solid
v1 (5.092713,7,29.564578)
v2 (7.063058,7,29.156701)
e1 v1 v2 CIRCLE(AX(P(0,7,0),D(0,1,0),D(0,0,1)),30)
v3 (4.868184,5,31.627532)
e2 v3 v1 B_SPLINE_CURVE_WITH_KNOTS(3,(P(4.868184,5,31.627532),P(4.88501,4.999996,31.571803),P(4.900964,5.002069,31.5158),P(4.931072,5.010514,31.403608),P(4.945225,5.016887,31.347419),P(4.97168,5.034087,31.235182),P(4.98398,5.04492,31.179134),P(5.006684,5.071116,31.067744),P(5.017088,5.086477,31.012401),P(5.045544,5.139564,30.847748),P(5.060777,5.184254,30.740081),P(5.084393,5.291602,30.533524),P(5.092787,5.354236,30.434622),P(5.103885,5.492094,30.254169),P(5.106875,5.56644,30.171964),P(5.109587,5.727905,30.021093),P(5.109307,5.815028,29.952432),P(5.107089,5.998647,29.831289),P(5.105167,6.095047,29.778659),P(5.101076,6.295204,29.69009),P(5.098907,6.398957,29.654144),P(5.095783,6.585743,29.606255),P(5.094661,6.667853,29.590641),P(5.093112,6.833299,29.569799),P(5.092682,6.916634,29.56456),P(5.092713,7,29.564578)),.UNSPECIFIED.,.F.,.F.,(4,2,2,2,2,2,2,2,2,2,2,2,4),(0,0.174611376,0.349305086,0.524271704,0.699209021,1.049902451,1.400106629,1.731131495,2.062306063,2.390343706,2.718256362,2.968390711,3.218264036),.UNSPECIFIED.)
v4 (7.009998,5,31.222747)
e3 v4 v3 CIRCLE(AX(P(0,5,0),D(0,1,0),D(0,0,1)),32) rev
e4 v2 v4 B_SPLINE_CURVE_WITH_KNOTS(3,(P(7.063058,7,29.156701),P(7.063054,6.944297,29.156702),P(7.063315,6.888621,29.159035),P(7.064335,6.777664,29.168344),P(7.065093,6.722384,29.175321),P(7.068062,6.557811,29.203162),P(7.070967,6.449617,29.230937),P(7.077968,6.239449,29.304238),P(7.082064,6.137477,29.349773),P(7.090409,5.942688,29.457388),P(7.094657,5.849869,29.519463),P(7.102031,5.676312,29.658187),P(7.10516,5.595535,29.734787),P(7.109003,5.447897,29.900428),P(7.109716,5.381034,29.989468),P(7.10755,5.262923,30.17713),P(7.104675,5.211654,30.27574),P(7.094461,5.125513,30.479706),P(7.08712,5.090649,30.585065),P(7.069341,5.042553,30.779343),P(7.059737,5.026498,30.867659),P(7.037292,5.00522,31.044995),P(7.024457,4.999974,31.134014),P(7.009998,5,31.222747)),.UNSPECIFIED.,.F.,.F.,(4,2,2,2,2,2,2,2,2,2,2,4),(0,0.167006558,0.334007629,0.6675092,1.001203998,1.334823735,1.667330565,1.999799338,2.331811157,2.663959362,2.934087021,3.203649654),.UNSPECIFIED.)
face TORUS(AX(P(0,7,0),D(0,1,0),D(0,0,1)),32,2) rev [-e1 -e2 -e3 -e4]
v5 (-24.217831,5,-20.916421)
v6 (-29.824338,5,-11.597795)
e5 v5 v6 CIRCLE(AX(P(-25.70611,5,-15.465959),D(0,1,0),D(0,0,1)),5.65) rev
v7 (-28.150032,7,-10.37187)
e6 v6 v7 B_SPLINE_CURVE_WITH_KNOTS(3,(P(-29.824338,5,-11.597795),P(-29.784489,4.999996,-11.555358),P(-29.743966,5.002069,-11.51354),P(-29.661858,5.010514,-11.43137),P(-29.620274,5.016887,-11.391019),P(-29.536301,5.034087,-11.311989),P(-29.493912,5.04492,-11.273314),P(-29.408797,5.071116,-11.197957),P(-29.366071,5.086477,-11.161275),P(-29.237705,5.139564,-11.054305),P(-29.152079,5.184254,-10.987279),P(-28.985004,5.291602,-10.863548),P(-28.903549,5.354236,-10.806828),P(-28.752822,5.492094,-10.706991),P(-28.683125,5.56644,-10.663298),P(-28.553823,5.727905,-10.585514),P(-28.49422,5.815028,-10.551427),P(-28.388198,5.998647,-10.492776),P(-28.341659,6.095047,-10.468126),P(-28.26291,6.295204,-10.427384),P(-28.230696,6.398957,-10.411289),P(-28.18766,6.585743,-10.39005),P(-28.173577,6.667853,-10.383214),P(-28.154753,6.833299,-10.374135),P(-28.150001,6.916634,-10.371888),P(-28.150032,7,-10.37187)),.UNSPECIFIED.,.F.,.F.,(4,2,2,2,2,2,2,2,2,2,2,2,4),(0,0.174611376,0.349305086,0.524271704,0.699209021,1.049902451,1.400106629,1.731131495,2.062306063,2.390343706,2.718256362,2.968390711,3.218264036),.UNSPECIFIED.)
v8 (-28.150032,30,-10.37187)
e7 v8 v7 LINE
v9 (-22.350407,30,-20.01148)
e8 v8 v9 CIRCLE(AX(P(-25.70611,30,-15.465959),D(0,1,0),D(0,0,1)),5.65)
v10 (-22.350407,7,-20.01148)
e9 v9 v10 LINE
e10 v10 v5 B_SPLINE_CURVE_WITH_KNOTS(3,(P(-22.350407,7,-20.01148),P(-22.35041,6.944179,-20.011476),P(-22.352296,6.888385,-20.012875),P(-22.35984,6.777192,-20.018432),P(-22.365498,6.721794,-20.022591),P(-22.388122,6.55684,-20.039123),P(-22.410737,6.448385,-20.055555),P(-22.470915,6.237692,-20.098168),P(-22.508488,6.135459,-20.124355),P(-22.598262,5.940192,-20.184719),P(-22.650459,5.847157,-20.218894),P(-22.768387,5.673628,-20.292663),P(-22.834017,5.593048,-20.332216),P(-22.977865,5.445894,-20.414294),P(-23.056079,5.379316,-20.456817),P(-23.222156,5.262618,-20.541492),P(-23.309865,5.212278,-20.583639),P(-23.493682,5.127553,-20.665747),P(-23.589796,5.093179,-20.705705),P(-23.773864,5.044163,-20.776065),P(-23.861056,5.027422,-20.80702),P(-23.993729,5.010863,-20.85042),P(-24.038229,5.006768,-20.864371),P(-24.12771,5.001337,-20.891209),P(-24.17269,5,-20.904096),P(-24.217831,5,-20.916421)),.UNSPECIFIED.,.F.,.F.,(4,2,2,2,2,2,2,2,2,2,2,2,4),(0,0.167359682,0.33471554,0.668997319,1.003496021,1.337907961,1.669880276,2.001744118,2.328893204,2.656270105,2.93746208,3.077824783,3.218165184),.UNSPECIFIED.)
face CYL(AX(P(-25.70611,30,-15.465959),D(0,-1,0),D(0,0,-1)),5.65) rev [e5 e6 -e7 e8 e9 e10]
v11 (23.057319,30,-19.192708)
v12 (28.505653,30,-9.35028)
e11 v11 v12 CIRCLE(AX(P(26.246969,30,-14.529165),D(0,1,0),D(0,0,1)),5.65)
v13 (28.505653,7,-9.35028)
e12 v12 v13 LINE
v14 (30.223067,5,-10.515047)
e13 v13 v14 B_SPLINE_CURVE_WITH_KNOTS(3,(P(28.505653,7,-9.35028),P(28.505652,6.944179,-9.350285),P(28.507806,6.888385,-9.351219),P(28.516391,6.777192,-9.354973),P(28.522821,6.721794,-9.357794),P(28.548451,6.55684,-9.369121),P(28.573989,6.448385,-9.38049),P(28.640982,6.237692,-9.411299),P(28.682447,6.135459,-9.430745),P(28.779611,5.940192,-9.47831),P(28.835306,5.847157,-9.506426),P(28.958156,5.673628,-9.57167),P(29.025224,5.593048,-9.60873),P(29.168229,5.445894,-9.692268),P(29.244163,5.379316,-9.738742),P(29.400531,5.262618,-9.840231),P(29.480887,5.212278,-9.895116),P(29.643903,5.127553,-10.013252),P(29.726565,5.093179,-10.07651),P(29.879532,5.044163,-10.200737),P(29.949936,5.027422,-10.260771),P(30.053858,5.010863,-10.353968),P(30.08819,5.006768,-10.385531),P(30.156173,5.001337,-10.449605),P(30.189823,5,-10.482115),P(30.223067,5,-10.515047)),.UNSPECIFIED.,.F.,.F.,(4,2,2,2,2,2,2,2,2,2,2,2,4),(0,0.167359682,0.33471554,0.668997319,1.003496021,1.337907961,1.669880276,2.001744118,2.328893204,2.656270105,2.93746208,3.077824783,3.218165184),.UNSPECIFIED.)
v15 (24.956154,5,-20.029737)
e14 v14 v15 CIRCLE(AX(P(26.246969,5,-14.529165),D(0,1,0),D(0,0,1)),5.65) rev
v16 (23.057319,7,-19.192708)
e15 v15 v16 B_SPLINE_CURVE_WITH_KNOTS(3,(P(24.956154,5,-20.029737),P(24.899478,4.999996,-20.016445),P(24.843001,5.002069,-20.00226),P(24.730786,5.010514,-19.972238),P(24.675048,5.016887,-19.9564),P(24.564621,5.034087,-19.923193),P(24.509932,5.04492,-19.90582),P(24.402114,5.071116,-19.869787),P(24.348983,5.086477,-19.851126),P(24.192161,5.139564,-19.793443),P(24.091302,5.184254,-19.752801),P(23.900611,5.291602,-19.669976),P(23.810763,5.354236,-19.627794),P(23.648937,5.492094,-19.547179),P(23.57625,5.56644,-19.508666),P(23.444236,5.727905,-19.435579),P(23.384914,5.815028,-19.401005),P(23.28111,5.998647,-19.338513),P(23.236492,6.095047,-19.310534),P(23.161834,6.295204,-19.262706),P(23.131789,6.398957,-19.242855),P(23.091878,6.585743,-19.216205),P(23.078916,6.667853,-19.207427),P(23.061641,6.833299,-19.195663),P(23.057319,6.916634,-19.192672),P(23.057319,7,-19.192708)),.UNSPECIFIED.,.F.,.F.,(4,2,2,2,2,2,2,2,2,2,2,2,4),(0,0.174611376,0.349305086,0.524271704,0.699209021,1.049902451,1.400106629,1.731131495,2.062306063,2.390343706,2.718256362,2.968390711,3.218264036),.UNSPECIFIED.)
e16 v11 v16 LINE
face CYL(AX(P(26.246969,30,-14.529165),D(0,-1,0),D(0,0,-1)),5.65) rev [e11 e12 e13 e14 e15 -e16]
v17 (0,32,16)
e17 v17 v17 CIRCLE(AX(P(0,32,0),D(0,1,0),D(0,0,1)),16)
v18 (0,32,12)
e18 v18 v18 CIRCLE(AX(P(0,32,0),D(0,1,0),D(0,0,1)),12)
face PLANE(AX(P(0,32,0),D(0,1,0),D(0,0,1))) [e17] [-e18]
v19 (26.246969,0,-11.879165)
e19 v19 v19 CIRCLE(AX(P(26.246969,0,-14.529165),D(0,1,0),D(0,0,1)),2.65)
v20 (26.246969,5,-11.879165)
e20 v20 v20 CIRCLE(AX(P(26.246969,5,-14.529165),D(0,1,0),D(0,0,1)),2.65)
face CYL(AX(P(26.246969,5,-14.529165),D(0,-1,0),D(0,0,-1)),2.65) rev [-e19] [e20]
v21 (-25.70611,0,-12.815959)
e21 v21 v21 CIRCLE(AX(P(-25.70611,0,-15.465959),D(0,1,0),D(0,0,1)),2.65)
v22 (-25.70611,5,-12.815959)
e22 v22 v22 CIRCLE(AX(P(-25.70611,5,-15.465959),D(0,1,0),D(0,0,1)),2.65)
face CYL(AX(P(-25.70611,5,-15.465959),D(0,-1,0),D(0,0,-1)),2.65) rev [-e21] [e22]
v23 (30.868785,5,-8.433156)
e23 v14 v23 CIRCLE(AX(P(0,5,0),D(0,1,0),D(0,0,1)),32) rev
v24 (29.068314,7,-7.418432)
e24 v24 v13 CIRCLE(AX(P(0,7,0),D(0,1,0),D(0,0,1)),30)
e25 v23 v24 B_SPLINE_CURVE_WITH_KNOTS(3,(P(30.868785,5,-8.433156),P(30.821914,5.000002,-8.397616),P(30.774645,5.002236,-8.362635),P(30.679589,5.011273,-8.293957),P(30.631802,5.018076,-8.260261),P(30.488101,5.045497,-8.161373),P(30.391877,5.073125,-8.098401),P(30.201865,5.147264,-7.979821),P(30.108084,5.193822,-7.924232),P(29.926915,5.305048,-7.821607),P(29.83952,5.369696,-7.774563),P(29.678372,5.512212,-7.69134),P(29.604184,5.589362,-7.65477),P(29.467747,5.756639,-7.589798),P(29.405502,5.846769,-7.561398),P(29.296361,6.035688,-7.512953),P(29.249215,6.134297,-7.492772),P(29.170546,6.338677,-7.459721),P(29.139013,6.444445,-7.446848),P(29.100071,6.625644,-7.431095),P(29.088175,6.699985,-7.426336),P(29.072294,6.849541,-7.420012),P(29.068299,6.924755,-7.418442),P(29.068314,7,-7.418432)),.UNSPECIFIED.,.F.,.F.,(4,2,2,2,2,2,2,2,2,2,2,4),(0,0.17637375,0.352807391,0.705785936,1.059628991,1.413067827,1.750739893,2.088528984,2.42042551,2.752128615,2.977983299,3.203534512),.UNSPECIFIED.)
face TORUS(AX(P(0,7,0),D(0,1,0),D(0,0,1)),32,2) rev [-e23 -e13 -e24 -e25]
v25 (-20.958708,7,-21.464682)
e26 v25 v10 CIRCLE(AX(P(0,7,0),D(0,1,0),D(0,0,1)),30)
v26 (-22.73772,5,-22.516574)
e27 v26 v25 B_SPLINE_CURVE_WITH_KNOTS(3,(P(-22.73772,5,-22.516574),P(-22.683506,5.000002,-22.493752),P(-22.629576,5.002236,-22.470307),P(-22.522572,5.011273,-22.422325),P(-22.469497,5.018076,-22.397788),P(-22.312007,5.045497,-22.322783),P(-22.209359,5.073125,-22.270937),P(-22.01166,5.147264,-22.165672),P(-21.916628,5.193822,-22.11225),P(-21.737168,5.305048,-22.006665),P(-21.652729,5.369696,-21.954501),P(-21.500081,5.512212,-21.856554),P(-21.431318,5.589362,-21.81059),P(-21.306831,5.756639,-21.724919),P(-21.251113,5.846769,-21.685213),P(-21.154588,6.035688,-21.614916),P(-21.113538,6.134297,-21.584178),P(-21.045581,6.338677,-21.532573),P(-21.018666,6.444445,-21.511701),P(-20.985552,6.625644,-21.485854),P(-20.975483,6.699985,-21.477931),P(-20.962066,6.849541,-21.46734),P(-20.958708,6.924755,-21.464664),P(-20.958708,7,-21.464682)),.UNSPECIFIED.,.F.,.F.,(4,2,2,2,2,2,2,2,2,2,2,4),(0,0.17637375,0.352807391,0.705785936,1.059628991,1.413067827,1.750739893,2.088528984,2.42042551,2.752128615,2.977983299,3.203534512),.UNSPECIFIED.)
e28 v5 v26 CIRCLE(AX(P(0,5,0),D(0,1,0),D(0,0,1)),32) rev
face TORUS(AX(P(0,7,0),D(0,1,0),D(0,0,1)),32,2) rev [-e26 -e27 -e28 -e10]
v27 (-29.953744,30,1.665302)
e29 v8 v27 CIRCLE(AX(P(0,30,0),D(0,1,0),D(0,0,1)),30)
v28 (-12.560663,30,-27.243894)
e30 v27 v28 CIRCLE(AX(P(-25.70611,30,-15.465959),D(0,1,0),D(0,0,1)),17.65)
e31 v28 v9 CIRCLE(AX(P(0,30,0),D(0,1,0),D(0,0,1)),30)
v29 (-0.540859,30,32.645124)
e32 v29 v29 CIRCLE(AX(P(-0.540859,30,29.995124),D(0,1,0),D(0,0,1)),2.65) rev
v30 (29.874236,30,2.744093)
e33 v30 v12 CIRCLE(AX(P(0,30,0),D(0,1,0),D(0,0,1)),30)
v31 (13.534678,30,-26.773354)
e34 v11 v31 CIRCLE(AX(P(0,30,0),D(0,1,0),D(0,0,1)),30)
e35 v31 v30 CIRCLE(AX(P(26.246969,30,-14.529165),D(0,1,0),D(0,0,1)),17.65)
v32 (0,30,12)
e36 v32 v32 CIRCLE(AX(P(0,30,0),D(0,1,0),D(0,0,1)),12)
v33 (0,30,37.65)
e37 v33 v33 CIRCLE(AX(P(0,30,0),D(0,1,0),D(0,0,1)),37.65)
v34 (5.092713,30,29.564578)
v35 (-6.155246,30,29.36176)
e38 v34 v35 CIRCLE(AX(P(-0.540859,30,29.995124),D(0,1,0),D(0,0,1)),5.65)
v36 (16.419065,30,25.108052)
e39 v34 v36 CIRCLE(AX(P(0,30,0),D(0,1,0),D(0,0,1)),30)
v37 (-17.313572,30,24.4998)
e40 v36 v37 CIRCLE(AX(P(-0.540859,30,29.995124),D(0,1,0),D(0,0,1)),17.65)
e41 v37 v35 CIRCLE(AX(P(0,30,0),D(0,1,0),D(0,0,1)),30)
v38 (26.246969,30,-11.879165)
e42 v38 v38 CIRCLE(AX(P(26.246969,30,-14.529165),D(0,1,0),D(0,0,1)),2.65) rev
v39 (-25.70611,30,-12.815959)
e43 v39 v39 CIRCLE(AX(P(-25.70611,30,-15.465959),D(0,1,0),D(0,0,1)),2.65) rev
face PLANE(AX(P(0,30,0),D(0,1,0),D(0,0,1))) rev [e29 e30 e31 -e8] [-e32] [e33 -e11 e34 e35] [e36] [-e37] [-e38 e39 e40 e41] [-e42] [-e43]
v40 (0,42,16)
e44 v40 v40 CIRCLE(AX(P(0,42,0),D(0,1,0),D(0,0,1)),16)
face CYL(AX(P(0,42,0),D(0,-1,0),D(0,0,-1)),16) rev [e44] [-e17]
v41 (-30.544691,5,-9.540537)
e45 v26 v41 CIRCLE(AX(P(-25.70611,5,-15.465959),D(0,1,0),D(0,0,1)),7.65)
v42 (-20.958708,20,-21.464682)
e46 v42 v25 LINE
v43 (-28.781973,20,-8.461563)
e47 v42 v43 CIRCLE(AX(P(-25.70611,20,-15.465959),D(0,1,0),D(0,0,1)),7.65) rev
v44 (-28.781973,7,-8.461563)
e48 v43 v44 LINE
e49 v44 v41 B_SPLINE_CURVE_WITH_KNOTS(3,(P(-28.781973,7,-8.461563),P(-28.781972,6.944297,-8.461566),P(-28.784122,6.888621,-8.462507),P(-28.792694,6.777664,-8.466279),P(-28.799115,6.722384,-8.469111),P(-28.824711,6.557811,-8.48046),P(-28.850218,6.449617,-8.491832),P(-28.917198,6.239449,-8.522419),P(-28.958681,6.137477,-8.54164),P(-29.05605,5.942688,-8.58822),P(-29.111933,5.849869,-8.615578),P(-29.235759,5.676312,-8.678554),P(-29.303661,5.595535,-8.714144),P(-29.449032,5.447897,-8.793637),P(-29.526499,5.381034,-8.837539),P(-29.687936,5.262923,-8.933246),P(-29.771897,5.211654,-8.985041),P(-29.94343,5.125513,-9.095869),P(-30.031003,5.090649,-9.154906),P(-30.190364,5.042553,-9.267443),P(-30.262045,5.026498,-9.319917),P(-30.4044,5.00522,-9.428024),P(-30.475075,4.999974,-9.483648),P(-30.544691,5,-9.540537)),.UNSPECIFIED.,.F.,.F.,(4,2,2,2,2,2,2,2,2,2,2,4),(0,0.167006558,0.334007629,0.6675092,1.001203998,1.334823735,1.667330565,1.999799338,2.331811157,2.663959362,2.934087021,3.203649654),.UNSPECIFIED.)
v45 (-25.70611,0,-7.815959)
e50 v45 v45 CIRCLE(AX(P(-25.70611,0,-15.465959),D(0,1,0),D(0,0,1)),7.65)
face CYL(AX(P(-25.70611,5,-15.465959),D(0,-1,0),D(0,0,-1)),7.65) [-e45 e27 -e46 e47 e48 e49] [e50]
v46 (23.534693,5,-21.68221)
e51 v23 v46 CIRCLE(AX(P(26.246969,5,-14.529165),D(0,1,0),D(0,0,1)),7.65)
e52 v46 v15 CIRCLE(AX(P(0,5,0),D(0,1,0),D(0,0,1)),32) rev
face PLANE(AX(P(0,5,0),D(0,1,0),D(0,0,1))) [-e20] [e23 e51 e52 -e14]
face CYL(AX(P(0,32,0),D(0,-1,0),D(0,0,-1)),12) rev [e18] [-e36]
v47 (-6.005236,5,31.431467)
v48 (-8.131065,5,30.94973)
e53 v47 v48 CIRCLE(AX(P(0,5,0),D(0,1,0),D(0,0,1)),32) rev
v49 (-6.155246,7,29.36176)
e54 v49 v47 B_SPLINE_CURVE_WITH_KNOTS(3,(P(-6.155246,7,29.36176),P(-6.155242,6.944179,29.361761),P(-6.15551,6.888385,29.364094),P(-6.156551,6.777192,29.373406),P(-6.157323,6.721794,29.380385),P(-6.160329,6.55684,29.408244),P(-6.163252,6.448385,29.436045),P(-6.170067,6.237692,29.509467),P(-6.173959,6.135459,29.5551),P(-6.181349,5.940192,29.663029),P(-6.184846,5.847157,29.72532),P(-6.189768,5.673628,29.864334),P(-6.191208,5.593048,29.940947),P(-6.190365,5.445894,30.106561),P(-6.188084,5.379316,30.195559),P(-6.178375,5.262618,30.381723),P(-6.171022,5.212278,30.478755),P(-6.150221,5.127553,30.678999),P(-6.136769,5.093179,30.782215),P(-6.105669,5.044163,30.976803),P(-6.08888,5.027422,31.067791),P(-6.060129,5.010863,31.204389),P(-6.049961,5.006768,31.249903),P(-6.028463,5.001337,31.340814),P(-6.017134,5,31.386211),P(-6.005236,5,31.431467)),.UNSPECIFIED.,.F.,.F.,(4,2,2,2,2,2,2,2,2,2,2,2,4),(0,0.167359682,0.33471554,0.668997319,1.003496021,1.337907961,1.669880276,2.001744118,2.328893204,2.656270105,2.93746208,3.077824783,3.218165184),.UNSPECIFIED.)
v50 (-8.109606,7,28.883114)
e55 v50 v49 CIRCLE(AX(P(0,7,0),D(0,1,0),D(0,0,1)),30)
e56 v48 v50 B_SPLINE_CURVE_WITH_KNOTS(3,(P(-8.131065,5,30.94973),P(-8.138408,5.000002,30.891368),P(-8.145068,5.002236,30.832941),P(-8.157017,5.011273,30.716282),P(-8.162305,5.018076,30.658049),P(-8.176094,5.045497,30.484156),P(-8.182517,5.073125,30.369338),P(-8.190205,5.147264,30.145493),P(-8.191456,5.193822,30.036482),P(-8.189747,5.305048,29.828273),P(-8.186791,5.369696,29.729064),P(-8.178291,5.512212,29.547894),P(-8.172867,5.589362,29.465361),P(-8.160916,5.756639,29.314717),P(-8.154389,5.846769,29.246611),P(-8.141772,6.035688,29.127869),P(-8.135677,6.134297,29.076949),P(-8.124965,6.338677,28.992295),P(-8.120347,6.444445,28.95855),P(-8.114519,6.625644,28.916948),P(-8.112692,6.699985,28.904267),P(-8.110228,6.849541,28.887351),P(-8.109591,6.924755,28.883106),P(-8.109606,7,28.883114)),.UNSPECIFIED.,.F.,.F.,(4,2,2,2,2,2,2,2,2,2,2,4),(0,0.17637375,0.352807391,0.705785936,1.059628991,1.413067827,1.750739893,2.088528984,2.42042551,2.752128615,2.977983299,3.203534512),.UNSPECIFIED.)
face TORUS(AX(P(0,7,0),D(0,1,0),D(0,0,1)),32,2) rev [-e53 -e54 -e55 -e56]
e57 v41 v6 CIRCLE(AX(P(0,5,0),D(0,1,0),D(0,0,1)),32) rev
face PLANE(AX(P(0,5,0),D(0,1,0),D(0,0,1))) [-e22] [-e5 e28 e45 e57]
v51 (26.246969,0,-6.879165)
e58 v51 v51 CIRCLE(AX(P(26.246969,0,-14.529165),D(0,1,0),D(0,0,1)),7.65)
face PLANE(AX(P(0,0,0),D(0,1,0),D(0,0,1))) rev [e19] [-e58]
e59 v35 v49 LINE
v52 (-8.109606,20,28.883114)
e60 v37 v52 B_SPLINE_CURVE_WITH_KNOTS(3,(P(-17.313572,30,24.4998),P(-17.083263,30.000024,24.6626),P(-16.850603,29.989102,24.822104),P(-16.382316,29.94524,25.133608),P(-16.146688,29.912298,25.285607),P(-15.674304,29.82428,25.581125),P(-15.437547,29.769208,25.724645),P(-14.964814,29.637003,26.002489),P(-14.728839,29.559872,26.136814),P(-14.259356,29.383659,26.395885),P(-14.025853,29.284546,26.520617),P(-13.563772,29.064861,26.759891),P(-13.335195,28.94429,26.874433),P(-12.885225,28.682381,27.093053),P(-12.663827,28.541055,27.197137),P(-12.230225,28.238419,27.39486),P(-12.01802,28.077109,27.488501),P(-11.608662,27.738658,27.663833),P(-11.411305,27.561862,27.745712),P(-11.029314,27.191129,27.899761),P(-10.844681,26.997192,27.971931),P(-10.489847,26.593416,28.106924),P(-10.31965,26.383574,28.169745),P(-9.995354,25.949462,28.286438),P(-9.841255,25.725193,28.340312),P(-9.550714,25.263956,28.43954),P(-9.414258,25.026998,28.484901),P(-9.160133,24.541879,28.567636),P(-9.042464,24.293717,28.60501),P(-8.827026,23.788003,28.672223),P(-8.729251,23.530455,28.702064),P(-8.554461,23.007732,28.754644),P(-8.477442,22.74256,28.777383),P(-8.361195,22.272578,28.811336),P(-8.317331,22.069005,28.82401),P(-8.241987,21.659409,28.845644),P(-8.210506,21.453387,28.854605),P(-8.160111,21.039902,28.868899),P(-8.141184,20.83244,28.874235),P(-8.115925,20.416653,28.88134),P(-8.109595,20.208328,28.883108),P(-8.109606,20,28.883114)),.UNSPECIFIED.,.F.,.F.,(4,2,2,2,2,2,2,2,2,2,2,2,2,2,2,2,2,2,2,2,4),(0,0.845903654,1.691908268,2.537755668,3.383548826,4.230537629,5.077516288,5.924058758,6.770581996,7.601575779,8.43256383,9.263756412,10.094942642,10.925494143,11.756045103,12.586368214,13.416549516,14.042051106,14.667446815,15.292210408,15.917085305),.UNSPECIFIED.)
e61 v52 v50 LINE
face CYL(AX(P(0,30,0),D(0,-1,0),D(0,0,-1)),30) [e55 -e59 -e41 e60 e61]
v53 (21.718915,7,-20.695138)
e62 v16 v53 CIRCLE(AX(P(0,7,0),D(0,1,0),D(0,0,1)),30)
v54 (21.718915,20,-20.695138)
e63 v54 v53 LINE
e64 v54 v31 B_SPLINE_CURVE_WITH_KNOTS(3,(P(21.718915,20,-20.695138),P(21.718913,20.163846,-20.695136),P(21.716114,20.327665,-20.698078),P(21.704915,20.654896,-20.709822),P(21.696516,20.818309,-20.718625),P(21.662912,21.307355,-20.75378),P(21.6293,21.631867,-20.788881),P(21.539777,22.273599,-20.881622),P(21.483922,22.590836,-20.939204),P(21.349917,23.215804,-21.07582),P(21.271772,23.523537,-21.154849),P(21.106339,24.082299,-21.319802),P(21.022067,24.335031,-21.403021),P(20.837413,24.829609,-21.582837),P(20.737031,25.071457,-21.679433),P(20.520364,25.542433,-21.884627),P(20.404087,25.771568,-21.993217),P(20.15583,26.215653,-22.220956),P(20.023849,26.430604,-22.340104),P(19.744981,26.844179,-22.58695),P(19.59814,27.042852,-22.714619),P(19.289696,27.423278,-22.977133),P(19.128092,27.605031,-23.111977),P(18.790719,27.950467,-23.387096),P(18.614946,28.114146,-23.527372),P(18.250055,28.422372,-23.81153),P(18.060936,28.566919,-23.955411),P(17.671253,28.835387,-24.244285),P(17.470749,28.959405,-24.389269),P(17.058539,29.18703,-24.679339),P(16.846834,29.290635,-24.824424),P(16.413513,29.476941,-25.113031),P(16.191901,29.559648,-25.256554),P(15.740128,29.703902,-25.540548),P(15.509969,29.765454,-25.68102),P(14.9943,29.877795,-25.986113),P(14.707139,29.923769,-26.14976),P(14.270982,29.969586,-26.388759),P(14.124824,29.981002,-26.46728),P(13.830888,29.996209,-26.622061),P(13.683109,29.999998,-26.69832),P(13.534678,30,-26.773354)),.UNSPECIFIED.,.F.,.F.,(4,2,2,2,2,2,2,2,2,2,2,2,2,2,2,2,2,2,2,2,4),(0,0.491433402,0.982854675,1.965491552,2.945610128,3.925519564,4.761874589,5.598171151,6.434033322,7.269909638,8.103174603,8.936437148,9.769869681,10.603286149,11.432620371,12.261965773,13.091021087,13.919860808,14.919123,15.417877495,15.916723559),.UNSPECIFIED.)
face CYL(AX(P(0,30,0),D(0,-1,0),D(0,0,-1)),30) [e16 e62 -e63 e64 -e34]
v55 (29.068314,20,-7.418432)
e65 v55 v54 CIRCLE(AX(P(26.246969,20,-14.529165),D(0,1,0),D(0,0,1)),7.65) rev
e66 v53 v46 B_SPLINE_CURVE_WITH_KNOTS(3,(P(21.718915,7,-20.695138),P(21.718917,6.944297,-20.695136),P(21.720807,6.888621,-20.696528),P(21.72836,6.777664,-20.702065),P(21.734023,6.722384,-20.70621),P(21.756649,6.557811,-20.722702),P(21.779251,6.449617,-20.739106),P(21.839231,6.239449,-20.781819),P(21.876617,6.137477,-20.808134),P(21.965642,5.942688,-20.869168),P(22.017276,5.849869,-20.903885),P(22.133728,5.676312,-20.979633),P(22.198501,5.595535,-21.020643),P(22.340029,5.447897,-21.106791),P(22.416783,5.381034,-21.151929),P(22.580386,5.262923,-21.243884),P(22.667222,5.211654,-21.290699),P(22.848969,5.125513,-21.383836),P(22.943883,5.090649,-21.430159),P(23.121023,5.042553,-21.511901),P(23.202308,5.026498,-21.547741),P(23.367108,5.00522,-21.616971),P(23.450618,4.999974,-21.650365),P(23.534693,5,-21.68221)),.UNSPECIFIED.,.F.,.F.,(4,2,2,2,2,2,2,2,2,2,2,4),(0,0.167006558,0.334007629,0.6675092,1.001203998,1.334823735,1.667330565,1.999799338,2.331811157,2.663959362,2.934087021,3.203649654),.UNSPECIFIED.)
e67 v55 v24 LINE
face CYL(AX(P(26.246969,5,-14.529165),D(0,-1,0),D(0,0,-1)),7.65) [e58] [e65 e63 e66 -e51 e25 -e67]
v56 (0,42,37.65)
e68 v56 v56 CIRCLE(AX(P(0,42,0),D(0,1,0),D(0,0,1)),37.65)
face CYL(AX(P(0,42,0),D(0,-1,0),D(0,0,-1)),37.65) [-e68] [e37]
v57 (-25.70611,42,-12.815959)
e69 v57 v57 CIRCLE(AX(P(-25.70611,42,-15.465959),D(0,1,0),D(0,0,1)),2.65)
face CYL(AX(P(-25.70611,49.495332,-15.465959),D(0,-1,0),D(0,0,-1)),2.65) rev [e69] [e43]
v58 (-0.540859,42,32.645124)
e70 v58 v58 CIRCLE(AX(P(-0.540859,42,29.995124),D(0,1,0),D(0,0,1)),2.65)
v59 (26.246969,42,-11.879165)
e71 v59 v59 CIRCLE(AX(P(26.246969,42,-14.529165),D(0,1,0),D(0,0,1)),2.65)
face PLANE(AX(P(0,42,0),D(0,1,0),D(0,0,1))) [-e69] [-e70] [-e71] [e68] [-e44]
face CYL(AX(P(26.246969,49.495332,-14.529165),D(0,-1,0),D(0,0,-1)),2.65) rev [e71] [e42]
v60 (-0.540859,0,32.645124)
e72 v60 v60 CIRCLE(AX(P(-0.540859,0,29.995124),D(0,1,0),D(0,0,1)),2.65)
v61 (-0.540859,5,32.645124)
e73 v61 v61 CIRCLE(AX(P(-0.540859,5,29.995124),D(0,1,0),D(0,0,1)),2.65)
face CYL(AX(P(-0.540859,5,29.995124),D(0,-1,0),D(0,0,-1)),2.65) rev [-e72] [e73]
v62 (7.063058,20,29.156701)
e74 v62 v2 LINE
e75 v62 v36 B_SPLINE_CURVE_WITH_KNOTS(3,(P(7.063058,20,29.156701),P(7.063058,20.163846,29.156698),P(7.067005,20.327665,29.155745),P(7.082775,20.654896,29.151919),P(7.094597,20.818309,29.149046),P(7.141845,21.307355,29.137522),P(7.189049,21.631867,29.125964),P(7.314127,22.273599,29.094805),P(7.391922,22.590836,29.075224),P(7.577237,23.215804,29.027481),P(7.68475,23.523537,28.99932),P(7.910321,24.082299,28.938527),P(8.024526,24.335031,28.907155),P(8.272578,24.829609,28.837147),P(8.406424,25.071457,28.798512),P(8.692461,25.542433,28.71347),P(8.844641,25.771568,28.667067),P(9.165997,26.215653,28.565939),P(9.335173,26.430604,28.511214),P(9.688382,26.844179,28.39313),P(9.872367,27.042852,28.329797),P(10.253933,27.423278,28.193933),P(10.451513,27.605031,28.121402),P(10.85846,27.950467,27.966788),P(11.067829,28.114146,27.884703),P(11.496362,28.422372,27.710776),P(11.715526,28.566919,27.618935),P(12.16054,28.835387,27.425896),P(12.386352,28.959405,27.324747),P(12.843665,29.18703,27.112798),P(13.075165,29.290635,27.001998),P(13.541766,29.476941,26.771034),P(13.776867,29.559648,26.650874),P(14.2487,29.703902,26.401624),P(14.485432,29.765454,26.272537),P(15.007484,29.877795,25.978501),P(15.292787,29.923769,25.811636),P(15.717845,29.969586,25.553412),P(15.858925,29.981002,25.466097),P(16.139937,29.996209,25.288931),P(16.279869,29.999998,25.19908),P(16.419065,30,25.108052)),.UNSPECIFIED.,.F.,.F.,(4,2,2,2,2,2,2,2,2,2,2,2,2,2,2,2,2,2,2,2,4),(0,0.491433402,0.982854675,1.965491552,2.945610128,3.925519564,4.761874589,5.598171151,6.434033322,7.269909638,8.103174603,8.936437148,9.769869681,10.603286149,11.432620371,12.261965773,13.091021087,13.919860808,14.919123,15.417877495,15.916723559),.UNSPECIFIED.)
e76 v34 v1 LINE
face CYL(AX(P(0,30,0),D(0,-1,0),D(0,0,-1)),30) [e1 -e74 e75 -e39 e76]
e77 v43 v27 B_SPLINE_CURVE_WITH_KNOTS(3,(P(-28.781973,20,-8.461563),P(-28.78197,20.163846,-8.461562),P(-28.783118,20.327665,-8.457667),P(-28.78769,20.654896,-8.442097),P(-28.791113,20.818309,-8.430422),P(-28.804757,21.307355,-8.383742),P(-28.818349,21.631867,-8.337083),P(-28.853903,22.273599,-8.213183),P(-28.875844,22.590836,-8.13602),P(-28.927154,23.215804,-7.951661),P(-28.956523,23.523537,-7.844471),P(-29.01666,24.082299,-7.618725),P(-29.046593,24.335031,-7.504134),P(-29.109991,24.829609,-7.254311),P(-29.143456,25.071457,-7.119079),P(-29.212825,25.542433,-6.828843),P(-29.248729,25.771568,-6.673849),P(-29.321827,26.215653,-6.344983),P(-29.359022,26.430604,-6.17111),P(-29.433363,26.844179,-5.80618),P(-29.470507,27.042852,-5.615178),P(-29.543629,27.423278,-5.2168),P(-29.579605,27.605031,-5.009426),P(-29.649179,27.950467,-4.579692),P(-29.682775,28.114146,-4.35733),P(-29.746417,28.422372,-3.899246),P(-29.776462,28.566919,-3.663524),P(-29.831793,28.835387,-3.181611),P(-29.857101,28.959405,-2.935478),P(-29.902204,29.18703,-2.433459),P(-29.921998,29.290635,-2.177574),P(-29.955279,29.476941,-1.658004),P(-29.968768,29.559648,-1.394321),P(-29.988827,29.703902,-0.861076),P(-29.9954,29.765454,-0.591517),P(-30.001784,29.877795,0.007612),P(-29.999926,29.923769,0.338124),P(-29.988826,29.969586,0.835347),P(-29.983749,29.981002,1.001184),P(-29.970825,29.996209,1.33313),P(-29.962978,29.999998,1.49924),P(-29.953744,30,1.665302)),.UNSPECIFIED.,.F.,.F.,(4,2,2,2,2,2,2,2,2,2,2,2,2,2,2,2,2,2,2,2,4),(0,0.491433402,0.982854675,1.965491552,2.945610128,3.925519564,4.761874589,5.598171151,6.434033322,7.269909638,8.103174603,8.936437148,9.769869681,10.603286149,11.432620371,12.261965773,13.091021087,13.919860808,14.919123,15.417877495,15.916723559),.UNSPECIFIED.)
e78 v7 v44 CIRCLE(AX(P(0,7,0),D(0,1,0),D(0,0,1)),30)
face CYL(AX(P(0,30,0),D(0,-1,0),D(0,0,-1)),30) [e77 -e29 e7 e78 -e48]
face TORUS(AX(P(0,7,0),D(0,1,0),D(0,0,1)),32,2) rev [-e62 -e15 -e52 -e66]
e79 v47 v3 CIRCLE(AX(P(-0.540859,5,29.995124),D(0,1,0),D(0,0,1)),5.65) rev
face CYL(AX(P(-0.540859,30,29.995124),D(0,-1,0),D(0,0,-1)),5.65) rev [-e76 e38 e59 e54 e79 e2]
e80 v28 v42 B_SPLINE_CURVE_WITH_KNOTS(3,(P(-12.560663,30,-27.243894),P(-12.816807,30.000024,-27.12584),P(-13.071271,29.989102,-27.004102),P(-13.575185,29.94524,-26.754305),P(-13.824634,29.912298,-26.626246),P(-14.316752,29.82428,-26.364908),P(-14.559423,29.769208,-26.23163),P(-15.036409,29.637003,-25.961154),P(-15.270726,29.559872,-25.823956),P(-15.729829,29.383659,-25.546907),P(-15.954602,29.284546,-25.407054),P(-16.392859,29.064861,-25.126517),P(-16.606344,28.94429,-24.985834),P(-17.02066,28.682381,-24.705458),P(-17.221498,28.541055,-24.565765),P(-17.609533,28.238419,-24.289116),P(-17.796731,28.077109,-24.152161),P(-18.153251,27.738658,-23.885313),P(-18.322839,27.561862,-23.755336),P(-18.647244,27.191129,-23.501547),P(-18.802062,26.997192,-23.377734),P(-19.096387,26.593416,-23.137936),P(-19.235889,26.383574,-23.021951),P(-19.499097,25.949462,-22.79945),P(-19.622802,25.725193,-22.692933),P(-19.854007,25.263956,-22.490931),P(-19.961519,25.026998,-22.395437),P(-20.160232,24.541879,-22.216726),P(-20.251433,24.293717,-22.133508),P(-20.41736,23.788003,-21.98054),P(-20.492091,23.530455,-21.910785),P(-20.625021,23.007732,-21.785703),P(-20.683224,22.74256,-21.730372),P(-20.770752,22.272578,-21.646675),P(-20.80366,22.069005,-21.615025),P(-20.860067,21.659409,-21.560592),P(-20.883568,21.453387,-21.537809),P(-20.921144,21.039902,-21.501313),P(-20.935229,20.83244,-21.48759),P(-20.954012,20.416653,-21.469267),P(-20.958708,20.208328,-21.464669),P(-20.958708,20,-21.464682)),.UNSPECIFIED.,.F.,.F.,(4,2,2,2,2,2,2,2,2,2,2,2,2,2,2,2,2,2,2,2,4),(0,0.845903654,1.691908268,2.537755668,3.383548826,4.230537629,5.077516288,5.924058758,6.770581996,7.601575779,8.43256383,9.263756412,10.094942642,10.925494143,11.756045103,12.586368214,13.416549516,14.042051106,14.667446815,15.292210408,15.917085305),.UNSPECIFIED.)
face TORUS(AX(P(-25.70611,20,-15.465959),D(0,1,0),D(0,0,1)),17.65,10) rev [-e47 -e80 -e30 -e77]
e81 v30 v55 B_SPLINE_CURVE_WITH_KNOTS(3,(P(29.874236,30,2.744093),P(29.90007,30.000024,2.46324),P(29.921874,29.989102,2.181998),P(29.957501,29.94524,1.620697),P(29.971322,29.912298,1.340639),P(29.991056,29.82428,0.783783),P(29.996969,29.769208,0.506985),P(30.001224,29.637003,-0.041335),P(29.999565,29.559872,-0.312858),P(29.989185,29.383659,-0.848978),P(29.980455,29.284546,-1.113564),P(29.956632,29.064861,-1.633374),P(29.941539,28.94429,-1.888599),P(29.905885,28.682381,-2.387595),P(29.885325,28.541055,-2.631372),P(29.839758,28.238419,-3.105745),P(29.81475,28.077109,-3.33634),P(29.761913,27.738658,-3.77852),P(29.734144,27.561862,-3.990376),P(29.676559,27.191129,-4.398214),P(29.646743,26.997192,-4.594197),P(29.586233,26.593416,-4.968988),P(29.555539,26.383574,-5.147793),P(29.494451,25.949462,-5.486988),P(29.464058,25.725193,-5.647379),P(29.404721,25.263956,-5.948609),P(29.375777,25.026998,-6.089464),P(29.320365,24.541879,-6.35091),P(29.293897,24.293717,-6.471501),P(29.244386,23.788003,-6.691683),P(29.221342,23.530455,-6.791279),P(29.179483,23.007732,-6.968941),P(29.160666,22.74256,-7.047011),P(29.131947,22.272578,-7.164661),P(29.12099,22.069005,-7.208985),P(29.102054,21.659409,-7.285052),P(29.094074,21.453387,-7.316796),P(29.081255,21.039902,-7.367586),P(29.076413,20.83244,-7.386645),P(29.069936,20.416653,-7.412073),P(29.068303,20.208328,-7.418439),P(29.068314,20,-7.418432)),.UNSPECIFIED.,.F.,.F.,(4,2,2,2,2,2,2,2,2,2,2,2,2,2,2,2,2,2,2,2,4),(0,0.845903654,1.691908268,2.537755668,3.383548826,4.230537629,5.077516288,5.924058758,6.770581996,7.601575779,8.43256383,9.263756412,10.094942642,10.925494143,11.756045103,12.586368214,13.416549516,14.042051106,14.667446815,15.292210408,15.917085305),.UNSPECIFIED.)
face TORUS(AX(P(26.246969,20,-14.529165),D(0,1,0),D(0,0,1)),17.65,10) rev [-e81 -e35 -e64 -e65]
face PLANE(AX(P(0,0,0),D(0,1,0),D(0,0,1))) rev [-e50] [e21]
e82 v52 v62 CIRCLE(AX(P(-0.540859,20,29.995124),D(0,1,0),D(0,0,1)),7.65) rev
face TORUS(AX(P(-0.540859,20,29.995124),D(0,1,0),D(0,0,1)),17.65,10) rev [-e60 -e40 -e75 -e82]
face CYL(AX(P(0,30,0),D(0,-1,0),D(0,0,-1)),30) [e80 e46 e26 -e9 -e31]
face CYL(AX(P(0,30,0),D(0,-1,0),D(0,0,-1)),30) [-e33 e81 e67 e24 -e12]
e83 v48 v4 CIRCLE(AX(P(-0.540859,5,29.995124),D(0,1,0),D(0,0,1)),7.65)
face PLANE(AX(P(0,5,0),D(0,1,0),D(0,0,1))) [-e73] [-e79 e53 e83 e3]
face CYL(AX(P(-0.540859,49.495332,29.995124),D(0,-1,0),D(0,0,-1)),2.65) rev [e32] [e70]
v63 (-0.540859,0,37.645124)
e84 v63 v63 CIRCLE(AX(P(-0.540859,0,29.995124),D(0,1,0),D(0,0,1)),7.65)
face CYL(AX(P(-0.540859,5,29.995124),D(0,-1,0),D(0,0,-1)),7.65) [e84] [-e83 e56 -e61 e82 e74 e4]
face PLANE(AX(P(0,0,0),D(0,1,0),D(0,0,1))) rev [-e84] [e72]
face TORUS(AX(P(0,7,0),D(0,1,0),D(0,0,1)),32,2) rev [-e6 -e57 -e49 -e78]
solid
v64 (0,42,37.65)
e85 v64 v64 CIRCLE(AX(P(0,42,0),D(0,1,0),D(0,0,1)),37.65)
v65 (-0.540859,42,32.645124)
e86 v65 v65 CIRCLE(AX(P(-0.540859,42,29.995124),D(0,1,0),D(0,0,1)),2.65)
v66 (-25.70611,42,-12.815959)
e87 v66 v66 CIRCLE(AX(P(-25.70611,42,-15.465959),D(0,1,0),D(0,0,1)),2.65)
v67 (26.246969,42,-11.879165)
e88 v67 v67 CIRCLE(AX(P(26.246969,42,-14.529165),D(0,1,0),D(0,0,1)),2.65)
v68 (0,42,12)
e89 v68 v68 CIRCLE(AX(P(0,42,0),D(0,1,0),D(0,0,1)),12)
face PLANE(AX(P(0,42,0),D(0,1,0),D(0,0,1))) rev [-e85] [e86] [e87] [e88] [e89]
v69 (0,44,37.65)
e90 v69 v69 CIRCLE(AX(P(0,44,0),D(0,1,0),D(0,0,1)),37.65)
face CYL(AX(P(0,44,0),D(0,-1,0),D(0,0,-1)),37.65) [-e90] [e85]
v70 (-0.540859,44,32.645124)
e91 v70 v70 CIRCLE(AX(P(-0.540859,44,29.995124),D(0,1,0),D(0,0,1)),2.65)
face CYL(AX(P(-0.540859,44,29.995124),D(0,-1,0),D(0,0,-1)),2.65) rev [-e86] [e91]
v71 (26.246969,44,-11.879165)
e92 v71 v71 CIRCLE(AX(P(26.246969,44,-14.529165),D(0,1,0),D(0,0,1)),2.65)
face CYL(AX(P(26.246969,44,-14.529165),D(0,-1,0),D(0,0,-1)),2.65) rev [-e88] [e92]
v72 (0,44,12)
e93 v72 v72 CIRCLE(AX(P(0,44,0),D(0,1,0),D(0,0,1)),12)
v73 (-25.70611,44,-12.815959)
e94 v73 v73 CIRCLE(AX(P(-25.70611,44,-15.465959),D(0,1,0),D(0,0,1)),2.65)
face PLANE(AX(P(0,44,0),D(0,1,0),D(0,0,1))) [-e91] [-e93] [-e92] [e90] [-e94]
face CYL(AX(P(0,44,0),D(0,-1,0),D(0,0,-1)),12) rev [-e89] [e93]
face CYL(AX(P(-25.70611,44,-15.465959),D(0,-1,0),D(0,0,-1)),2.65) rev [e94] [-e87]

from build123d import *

# Parameters (mm, degrees)
SKETCH1_R             = 7.65
SKETCH1_R_2           = 2.65
BOSS_EXTRUDE1_DEPTH   = 5
BOSS_EXTRUDE1_2_DEPTH = 5
BOSS_EXTRUDE1_3_DEPTH = 5
BOSS_EXTRUDE2_DEPTH   = 30
SKETCH2_R             = 37.65
SKETCH2_R_2           = 16
BOSS_EXTRUDE3_DEPTH   = 12
SKETCH1_4_R           = 2.65
CUT_EXTRUDE1_DEPTH    = 42
SKETCH2_3_R           = 16
SKETCH2_3_R_2         = 12
BOSS_EXTRUDE4_DEPTH   = 2
SKETCH3_R             = 37.65
SKETCH3_R_2           = 12
SKETCH3_R_3           = 2.65
BOSS_EXTRUDE5_DEPTH   = 2
FILLET1_R             = 10
FILLET2_R             = 2


with BuildPart() as part:
    # Sketch1 → Boss-Extrude1 (new body)
    with BuildSketch(Plane(origin=(0, 0, 0), x_dir=(1, 0, 0), z_dir=(0, 1, 0))):
        with Locations(Location((-25.706110121, 15.465959473, 0), (0, 0, 270))):
            Circle(SKETCH1_R)
        with Locations(Location((-25.706110121, 15.465959473, 0), (0, 0, 270))):
            Circle(SKETCH1_R_2, mode=Mode.SUBTRACT)
    extrude(amount=BOSS_EXTRUDE1_DEPTH)



with BuildPart() as body_2:
    # Sketch1 → Boss-Extrude1 2 (new body)
    with BuildSketch(Plane(origin=(0, 0, 0), x_dir=(1, 0, 0), z_dir=(0, 1, 0))):
        with Locations(Location((26.246968858, 14.529164661, 0), (0, 0, 270))):
            Circle(SKETCH1_R)
        with Locations(Location((26.246968858, 14.529164661, 0), (0, 0, 270))):
            Circle(SKETCH1_R_2, mode=Mode.SUBTRACT)
    extrude(amount=BOSS_EXTRUDE1_2_DEPTH)


with BuildPart() as body_3:
    # Sketch1 → Boss-Extrude1 3 (new body)
    with BuildSketch(Plane(origin=(0, 0, 0), x_dir=(1, 0, 0), z_dir=(0, 1, 0))):
        with Locations(Location((-0.540858737, -29.995124134, 0), (0, 0, 270))):
            Circle(SKETCH1_R)
        with Locations(Location((-0.540858737, -29.995124134, 0), (0, 0, 270))):
            Circle(SKETCH1_R_2, mode=Mode.SUBTRACT)
    extrude(amount=BOSS_EXTRUDE1_3_DEPTH)


with BuildPart() as part_1:
    add(part.part)

    add(body_2.part)  # Boss-Extrude2 merges body 2

    add(body_3.part)  # Boss-Extrude2 merges body 3
    # Sketch1<3> → Boss-Extrude2 (add)
    with BuildSketch(Plane(origin=(0, 0, 0), x_dir=(1, 0, 0), z_dir=(0, 1, 0))):
        with BuildLine():
            ThreePointArc((21.718914877, 20.695137994), (19.5539918, 10.824227672), (29.06831369, 7.418432396))
            ThreePointArc((29.06831369, 7.418432396), (28.80318426, 8.389074827), (28.505653158, 9.350280106))
            ThreePointArc((28.505653158, 9.350280106), (21.303789723, 11.79283865), (23.057319156, 19.192707817))
            ThreePointArc((23.057319156, 19.192707817), (22.400716677, 19.955147014), (21.718914877, 20.695137994))
        make_face()
        with BuildLine():
            ThreePointArc((5.092712959, -29.56457804), (6.081305912, -29.377163212), (7.063057799, -29.156701023))
            ThreePointArc((7.063057799, -29.156701023), (-0.402939759, -22.34636748), (-8.109605934, -28.883114299))
            ThreePointArc((-8.109605934, -28.883114299), (-7.136440215, -29.138826693), (-6.155246475, -29.361759839))
            ThreePointArc((-6.155246475, -29.361759839), (-0.438997008, -24.346042422), (5.092712959, -29.56457804))
        make_face()
        with BuildLine():
            ThreePointArc((-28.781972676, 8.461563029), (-19.15105204, 11.522139808), (-20.958707756, 21.464681903))
            ThreePointArc((-20.958707756, 21.464681903), (-21.666744045, 20.749751866), (-22.350406683, 20.011479733))
            ThreePointArc((-22.350406683, 20.011479733), (-20.864792715, 12.553203773), (-28.150032115, 10.371870223))
            ThreePointArc((-28.150032115, 10.371870223), (-28.482022589, 9.422016198), (-28.781972676, 8.461563029))
        make_face()
    extrude(amount=BOSS_EXTRUDE2_DEPTH)

    # Sketch2 → Boss-Extrude3 (add)
    with BuildSketch(Plane(origin=(0, 30, 0), x_dir=(1, 0, 0), z_dir=(0, 1, 0))):
        with Locations(Location((0, 0, 0), (0, 0, 270))):
            Circle(SKETCH2_R)
        with Locations(Location((0, 0, 0), (0, 0, 270))):
            Circle(SKETCH2_R_2, mode=Mode.SUBTRACT)
    extrude(amount=BOSS_EXTRUDE3_DEPTH)

    # Sketch1<4> → Cut-Extrude1 (cut)
    with BuildSketch(Plane(origin=(0, 0, 0), x_dir=(1, 0, 0), z_dir=(0, 1, 0))):
        with Locations(Location((-25.706110121, 15.465959473, 0), (0, 0, 270))):
            Circle(SKETCH1_4_R)
        with Locations(Location((26.246968858, 14.529164661, 0), (0, 0, 270))):
            Circle(SKETCH1_4_R)
        with Locations(Location((-0.540858737, -29.995124134, 0), (0, 0, 270))):
            Circle(SKETCH1_4_R)
    extrude(amount=CUT_EXTRUDE1_DEPTH, mode=Mode.SUBTRACT)

    # Sketch2<3> → Boss-Extrude4 (add)
    with BuildSketch(Plane(origin=(0, 30, 0), x_dir=(1, 0, 0), z_dir=(0, 1, 0))):
        with Locations(Location((0, 0, 0), (0, 0, 270))):
            Circle(SKETCH2_3_R)
        with Locations(Location((0, 0, 0), (0, 0, 270))):
            Circle(SKETCH2_3_R_2, mode=Mode.SUBTRACT)
    extrude(amount=BOSS_EXTRUDE4_DEPTH)

    # Fillet1
    fillet1_edges = [part_1.edges().sort_by_distance(p)[0] for p in [
        (-19.15105204, 30, -11.522139808),
        (-0.402939759, 30, 22.34636748),
        (19.5539918, 30, -10.824227672),
    ]]
    fillet(fillet1_edges, radius=FILLET1_R)

    # Fillet2
    # the kernel refuses this fillet: 2 mm, written as the material it adds along each edge
    with BuildSketch(Plane(origin=(0, 5, 0), x_dir=(-0.9928962854654476, 0, -0.11898305051105518), z_dir=(-0.11898305051105518, 0, 0.9928962854654476))) as fillet2_piece_1_section:
        with BuildLine():
            CenterArc((30 + FILLET2_R, -FILLET2_R), FILLET2_R, 90, 90)
            Line((30, -FILLET2_R), (30, 0))
            Line((30, 0), (30 + FILLET2_R, 0))
        make_face()
    fillet2_piece_1 = revolve(axis=Axis((0, 5, 0), (0, -1, 0)), revolution_arc=22.942191835, mode=Mode.PRIVATE)
    fillet2_piece_1 = fillet2_piece_1 & Plane(origin=(-25.706110121, 5.449479816, -15.465959473), x_dir=(0, 0, 1), z_dir=(0, -1, 0)) * Cylinder(7.65, 129, mode=Mode.PRIVATE)
    fillet2_piece_1 = fillet2_piece_1 - Plane(origin=(-25.706110121, 5.449479816, -15.465959473), x_dir=(0.5939298121240703, 0, -0.8045168601528913), z_dir=(0, -1, 0)) * Cylinder(5.65, 129, mode=Mode.PRIVATE)
    add(fillet2_piece_1)
    with BuildSketch(Plane(origin=(0, 5, 0), x_dir=(-0.8453510442178569, 0, -0.5342112054607044), z_dir=(-0.5342112054607044, 0, 0.8453510442178569))) as fillet2_piece_2_section:
        with BuildLine():
            CenterArc((30 + FILLET2_R, -FILLET2_R), FILLET2_R, 90, 90)
            Line((30, -FILLET2_R), (30, 0))
            Line((30, 0), (30 + FILLET2_R, 0))
        make_face()
    fillet2_piece_2 = revolve(axis=Axis((0, 5, 0), (0, -1, 0)), revolution_arc=22.942191835, mode=Mode.PRIVATE)
    fillet2_piece_2 = fillet2_piece_2 & Plane(origin=(-25.706110121, 5.449479588, -15.465959473), x_dir=(0, 0, 1), z_dir=(0, -1, 0)) * Cylinder(7.65, 128, mode=Mode.PRIVATE)
    fillet2_piece_2 = fillet2_piece_2 - Plane(origin=(-25.706110121, 5.449479588, -15.465959473), x_dir=(0.5939298121240703, 0, -0.8045168601528913), z_dir=(0, -1, 0)) * Cylinder(5.65, 128, mode=Mode.PRIVATE)
    add(fillet2_piece_2)
    with BuildSketch(Plane(origin=(0, 5, 0), x_dir=(0.3934057983704155, 0, 0.9193649317917972), z_dir=(0.9193649317917972, 0, -0.3934057983704155))) as fillet2_piece_3_section:
        with BuildLine():
            CenterArc((30 + FILLET2_R, -FILLET2_R), FILLET2_R, 90, 90)
            Line((30, -FILLET2_R), (30, 0))
            Line((30, 0), (30 + FILLET2_R, 0))
        make_face()
    fillet2_piece_3 = revolve(axis=Axis((0, 5, 0), (0, -1, 0)), revolution_arc=22.942191835, mode=Mode.PRIVATE)
    fillet2_piece_3 = fillet2_piece_3 & Plane(origin=(-0.540858737, 5.449479816, 29.995124134), x_dir=(0, 0, 1), z_dir=(0, -1, 0)) * Cylinder(7.65, 128, mode=Mode.PRIVATE)
    fillet2_piece_3 = fillet2_piece_3 - Plane(origin=(-0.540858737, 5.449479816, 29.995124134), x_dir=(-0.9936969447273312, 0, -0.11209987528792113), z_dir=(0, -1, 0)) * Cylinder(5.65, 128, mode=Mode.PRIVATE)
    add(fillet2_piece_3)
    with BuildSketch(Plane(origin=(0, 5, 0), x_dir=(-0.03996495280640961, 0, 0.9992010821387162), z_dir=(0.9992010821387162, 0, 0.03996495280640961))) as fillet2_piece_4_section:
        with BuildLine():
            CenterArc((30 + FILLET2_R, -FILLET2_R), FILLET2_R, 90, 90)
            Line((30, -FILLET2_R), (30, 0))
            Line((30, 0), (30 + FILLET2_R, 0))
        make_face()
    fillet2_piece_4 = revolve(axis=Axis((0, 5, 0), (0, -1, 0)), revolution_arc=22.942191835, mode=Mode.PRIVATE)
    fillet2_piece_4 = fillet2_piece_4 & Plane(origin=(-0.540858737, 5.449479588, 29.995124134), x_dir=(0, 0, 1), z_dir=(0, -1, 0)) * Cylinder(7.65, 129, mode=Mode.PRIVATE)
    fillet2_piece_4 = fillet2_piece_4 - Plane(origin=(-0.540858737, 5.449479588, 29.995124134), x_dir=(-0.9936969447273312, 0, -0.11209987528792113), z_dir=(0, -1, 0)) * Cylinder(5.65, 129, mode=Mode.PRIVATE)
    add(fillet2_piece_4)
    with BuildSketch(Plane(origin=(0, 5, 0), x_dir=(0.599490487095163, 0, -0.8003818812806823), z_dir=(-0.8003818812806823, 0, -0.599490487095163))) as fillet2_piece_5_section:
        with BuildLine():
            CenterArc((30 + FILLET2_R, -FILLET2_R), FILLET2_R, 90, 90)
            Line((30, -FILLET2_R), (30, 0))
            Line((30, 0), (30 + FILLET2_R, 0))
        make_face()
    fillet2_piece_5 = revolve(axis=Axis((0, 5, 0), (0, -1, 0)), revolution_arc=22.942191835, mode=Mode.PRIVATE)
    fillet2_piece_5 = fillet2_piece_5 & Plane(origin=(26.246968858, 5.449479816, -14.529164661), x_dir=(0, 0, 1), z_dir=(0, -1, 0)) * Cylinder(7.65, 129, mode=Mode.PRIVATE)
    fillet2_piece_5 = fillet2_piece_5 - Plane(origin=(26.246968858, 5.449479816, -14.529164661), x_dir=(0.39976713260322355, 0, 0.9166167354408258), z_dir=(0, -1, 0)) * Cylinder(5.65, 129, mode=Mode.PRIVATE)
    add(fillet2_piece_5)
    with BuildSketch(Plane(origin=(0, 5, 0), x_dir=(0.8853159970242256, 0, -0.464989876677978), z_dir=(-0.464989876677978, 0, -0.8853159970242256))) as fillet2_piece_6_section:
        with BuildLine():
            CenterArc((30 + FILLET2_R, -FILLET2_R), FILLET2_R, 90, 90)
            Line((30, -FILLET2_R), (30, 0))
            Line((30, 0), (30 + FILLET2_R, 0))
        make_face()
    fillet2_piece_6 = revolve(axis=Axis((0, 5, 0), (0, -1, 0)), revolution_arc=22.942191835, mode=Mode.PRIVATE)
    fillet2_piece_6 = fillet2_piece_6 & Plane(origin=(26.246968858, 5.449479588, -14.529164661), x_dir=(0, 0, 1), z_dir=(0, -1, 0)) * Cylinder(7.65, 128, mode=Mode.PRIVATE)
    fillet2_piece_6 = fillet2_piece_6 - Plane(origin=(26.246968858, 5.449479588, -14.529164661), x_dir=(0.39976713260322355, 0, 0.9166167354408258), z_dir=(0, -1, 0)) * Cylinder(5.65, 128, mode=Mode.PRIVATE)
    add(fillet2_piece_6)


with BuildPart() as body_2_2:
    # Sketch3 → Boss-Extrude5 (new body)
    with BuildSketch(Plane(origin=(0, 42, 0), x_dir=(1, 0, 0), z_dir=(0, 1, 0))):
        with Locations(Location((0, 0, 0), (0, 0, 270))):
            Circle(SKETCH3_R)
        with Locations(Location((0, 0, 0), (0, 0, 270))):
            Circle(SKETCH3_R_2, mode=Mode.SUBTRACT)
        with Locations(Location((-0.540858737, -29.995124134, 0), (0, 0, 270))):
            Circle(SKETCH3_R_3, mode=Mode.SUBTRACT)
        with Locations(Location((26.246968858, 14.529164661, 0), (0, 0, 270))):
            Circle(SKETCH3_R_3, mode=Mode.SUBTRACT)
        with Locations(Location((-25.706110121, 15.465959473, 0), (0, 0, 270))):
            Circle(SKETCH3_R_3, mode=Mode.SUBTRACT)
    extrude(amount=BOSS_EXTRUDE5_DEPTH)


solid = Compound([part_1.part, body_2_2.part])
